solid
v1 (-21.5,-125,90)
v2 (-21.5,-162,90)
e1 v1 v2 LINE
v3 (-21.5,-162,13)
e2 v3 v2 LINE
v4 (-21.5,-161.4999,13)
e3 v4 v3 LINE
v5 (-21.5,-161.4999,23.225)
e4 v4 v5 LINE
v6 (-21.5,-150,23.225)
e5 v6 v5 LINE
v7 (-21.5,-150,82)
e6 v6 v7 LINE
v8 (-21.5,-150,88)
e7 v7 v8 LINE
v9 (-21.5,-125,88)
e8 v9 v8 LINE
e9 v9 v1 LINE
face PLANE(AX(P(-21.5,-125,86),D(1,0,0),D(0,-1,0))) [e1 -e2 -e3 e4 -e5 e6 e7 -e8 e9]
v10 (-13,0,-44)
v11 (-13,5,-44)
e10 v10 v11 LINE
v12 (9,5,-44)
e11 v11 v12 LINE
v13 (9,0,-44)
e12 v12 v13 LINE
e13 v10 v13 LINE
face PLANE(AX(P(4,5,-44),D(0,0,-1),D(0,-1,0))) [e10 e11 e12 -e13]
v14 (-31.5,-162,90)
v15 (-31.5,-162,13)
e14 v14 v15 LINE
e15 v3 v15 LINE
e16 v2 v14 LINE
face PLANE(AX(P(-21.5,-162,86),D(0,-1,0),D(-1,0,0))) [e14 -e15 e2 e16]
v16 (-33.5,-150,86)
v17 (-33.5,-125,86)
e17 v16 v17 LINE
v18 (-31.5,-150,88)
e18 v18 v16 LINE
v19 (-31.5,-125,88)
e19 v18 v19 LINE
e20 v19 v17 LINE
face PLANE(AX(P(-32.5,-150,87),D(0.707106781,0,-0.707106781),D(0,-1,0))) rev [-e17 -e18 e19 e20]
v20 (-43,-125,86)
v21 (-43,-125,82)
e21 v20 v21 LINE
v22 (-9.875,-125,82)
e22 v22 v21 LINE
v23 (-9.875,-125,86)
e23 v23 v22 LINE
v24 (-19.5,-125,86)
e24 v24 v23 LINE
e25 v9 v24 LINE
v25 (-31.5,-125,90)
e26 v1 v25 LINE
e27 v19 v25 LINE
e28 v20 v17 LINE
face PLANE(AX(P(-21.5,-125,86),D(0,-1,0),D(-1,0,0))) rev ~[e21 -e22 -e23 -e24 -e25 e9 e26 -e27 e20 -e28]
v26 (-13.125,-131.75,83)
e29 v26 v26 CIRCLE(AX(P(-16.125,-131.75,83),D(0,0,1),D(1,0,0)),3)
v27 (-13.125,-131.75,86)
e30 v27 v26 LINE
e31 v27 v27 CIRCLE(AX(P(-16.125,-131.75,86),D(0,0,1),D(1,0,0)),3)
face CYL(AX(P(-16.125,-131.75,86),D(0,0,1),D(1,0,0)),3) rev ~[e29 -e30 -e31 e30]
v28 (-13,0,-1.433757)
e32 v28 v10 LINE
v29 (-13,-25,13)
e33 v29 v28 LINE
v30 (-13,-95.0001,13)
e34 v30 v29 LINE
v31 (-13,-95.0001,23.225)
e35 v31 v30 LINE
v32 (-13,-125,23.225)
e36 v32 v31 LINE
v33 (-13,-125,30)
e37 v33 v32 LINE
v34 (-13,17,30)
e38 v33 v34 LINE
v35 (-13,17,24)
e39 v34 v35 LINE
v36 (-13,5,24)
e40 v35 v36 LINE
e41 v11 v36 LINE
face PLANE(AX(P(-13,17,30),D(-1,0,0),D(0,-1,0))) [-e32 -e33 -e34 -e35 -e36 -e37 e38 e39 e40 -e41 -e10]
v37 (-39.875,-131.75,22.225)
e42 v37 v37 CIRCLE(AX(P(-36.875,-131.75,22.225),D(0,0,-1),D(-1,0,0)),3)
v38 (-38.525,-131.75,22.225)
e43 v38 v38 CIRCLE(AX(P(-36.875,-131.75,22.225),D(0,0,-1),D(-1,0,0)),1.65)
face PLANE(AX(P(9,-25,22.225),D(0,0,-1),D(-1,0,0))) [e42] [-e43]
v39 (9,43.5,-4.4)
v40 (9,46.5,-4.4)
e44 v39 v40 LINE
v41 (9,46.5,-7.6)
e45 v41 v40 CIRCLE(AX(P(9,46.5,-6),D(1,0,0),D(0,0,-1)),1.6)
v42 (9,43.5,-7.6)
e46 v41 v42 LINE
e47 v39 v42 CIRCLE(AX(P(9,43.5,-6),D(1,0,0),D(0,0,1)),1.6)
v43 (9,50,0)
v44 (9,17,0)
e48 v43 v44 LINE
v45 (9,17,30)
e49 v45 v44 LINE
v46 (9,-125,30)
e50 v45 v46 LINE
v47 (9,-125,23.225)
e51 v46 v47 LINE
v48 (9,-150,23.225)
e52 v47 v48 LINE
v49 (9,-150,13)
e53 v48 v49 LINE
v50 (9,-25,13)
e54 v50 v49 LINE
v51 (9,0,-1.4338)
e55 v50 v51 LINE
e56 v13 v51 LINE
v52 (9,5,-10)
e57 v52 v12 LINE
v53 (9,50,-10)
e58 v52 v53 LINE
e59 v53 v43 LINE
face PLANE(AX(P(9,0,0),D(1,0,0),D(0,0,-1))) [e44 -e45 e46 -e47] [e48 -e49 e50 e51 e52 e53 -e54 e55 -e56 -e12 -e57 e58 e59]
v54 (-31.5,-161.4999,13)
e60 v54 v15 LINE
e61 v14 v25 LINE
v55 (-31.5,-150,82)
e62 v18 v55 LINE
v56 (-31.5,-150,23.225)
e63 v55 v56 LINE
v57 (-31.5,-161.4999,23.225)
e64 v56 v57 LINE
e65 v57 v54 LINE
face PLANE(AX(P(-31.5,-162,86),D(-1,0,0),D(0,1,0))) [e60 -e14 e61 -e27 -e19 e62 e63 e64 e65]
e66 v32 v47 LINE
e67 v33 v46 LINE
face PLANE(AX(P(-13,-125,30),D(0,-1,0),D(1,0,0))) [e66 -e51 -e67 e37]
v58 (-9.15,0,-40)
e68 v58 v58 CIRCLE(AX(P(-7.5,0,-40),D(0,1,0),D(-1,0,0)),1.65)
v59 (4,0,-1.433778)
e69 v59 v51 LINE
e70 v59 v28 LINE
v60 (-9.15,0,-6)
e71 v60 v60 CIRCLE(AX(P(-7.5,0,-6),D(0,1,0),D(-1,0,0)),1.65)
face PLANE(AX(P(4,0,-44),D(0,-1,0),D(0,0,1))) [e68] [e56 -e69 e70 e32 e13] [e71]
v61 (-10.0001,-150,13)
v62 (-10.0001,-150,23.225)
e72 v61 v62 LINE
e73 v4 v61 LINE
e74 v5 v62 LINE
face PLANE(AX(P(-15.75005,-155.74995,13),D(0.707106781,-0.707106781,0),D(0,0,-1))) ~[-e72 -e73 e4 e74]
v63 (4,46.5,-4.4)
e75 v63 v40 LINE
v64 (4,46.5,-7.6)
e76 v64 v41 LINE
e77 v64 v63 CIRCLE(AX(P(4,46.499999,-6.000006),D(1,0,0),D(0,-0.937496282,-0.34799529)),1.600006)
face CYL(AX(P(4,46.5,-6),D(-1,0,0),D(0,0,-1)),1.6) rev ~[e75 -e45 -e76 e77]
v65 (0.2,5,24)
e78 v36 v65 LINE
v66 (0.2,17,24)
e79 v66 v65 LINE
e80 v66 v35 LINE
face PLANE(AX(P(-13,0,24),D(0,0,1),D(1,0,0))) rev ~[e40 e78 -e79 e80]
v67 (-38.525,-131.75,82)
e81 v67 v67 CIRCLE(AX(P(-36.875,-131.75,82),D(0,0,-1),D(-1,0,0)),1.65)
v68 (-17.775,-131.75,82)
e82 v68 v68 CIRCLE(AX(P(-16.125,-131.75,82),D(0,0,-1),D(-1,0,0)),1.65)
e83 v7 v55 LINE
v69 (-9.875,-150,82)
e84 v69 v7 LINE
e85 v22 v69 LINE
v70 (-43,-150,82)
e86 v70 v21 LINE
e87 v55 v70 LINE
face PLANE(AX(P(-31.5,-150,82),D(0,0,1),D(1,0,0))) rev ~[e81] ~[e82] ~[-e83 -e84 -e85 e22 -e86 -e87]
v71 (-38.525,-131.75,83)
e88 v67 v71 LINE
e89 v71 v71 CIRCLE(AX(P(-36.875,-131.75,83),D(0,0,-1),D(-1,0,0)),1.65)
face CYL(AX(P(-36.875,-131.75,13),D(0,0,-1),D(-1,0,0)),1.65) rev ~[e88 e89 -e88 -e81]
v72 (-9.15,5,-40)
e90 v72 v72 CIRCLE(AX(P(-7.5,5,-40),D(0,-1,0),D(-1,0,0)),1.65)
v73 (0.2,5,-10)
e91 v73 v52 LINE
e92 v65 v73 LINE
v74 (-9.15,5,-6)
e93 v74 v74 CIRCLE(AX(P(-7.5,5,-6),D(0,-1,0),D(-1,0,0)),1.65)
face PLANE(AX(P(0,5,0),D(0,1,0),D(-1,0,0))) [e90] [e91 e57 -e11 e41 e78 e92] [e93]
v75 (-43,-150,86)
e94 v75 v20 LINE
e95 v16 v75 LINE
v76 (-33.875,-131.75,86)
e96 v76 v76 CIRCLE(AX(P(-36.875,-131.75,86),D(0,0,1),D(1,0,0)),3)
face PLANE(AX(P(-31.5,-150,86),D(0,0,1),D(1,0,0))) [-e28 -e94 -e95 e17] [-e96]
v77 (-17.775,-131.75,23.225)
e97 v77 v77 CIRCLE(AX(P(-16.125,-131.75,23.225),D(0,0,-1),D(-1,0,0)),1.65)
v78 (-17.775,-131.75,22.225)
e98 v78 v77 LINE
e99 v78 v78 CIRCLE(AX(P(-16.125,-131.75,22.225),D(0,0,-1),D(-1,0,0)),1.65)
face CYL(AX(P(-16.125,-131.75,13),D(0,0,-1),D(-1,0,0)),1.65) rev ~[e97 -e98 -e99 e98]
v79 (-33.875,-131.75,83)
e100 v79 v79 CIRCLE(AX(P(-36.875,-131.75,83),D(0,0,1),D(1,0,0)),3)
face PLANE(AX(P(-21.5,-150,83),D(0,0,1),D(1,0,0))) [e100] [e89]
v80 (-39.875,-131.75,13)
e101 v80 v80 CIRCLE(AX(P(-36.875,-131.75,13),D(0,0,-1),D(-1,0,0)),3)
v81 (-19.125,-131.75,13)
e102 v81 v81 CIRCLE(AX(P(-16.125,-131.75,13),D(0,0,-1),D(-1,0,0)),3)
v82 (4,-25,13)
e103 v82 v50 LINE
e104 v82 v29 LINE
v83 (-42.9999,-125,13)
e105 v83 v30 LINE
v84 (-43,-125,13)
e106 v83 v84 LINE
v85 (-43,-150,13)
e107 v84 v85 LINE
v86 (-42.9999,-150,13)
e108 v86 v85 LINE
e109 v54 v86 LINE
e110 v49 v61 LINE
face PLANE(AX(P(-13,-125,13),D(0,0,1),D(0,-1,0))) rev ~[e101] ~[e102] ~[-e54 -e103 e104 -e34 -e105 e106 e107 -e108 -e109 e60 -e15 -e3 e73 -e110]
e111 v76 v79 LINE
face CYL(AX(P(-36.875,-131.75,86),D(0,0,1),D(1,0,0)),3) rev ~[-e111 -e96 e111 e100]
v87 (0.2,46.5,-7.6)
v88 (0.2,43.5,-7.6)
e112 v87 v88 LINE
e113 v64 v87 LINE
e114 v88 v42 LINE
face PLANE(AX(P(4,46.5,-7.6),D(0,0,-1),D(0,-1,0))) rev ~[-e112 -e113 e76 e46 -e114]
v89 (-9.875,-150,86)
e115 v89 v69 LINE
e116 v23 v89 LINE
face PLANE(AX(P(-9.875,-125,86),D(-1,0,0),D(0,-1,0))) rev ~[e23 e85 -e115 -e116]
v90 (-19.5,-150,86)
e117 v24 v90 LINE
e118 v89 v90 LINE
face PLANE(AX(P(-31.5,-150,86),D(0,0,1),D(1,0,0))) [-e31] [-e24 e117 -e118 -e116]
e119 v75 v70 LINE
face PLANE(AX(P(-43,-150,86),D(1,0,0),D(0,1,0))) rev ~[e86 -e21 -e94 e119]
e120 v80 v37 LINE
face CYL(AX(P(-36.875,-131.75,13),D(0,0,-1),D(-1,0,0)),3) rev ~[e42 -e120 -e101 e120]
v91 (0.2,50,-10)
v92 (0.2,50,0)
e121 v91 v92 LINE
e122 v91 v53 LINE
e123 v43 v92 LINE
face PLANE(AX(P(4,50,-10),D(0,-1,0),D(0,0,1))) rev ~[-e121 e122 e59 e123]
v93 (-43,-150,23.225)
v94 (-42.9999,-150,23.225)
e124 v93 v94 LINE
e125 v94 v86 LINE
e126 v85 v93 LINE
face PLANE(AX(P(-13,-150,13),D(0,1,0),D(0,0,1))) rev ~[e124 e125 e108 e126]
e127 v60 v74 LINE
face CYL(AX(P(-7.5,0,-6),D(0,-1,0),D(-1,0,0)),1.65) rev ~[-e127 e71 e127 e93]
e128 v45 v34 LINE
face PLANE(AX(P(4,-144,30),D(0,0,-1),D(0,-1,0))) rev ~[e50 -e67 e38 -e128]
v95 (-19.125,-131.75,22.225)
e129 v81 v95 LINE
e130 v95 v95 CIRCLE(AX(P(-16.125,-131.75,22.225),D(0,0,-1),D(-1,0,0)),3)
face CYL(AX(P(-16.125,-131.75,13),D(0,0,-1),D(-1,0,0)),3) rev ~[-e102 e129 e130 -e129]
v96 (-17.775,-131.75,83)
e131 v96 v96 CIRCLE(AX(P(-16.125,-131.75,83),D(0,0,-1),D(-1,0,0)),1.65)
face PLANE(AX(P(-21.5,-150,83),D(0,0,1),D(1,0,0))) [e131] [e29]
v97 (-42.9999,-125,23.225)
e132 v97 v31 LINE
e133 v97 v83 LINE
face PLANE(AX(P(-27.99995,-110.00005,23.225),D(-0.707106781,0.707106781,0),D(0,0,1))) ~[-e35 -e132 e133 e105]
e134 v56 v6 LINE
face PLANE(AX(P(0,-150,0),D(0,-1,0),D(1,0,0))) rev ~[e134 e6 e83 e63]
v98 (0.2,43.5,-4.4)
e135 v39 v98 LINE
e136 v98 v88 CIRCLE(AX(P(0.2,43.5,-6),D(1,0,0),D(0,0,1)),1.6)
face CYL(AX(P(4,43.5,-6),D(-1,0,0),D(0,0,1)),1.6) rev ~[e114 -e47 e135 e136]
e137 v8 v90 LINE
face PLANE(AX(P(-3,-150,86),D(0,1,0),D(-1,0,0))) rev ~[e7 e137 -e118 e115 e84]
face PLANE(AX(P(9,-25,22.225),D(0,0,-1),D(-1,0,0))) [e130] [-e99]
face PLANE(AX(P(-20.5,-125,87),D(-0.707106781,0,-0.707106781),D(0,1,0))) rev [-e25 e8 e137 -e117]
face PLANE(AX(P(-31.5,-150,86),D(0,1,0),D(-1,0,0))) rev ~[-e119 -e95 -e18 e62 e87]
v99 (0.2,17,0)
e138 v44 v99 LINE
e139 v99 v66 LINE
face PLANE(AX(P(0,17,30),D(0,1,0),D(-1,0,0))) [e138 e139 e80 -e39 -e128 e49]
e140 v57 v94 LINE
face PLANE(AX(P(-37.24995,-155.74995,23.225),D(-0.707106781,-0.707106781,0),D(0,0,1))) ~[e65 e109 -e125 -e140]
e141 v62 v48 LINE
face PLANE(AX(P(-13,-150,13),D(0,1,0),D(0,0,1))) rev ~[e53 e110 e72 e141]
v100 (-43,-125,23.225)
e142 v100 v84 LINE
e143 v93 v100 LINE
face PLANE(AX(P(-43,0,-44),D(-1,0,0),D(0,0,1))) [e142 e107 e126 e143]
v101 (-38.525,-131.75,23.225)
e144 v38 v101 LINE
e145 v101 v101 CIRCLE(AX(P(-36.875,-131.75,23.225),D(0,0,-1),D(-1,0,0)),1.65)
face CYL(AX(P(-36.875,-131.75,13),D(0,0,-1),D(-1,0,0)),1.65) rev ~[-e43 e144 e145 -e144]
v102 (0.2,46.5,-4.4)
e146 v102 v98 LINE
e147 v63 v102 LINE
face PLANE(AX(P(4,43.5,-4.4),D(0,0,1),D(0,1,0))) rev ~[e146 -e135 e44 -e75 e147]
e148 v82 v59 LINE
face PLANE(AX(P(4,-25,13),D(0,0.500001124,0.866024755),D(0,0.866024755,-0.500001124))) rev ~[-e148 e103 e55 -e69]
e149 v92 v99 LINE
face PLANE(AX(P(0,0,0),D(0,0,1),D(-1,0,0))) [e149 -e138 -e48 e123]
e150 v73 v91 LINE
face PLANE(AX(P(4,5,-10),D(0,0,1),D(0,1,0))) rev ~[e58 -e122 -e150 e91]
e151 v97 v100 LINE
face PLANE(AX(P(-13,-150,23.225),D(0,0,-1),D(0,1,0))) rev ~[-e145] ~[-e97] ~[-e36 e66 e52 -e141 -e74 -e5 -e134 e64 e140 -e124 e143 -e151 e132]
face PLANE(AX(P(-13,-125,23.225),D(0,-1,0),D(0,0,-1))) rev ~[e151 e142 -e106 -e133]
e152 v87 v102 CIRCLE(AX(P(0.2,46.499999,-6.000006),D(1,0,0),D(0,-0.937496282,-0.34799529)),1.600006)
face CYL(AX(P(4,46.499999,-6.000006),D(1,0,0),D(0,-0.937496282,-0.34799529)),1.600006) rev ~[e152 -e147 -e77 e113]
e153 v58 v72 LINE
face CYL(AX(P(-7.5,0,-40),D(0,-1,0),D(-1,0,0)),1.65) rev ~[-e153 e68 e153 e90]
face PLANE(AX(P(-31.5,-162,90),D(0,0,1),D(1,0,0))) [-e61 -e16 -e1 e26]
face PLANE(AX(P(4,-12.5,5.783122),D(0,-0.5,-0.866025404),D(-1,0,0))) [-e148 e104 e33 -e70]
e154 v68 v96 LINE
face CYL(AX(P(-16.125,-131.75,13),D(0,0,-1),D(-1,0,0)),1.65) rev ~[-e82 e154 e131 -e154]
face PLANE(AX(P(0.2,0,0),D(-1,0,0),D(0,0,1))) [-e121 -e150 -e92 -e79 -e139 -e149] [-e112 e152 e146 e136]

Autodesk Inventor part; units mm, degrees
ref_plane "YZ Plane" through (0, 0, 0) normal (1, 0, 0) x (0, 1, 0)
ref_plane "XZ Plane" through (0, 0, 0) normal (0, 1, 0) x (-1, 0, 0)
ref_plane "XY Plane" through (0, 0, 0) normal (0, 0, 1) x (1, 0, 0)
sketch "Sketch1" plane through (0, 0, 0) normal (0, 1, 0) x (-1, 0, 0)
  line L0 (0, 0) -> (13, 0)
  line L1 (13, 0) -> (13, -44)
  line L2 (13, -44) -> (0, -44)
  line L3 (0, -44) -> (0, 0)
  line L4 (13, 0) -> (13, -6)
  line L5 (13, -6) -> (7.5, -6)
  line L6 (7.5, -6) -> (7.5, -40)
  circle A0 centre (7.5, -6) radius 1.65
  circle A1 centre (7.5, -40) radius 1.65
  dimension "d0" = 13
  dimension "d1" = 44
  dimension "d2" = 6
  dimension "d3" = 5.5
  dimension "d4" = 34
  dimension "d5" = 3.3
  dimension "d6" = 3.3
extrude "Extrusion1" add sketch "Sketch1" along normal blind 5
sketch "Sketch2" plane through (0, 0, 0) normal (1, 0, 0) x (0, 0, -1)
  line L0 (0, 5) -> (44, 5) projected
  line L1 (0, 5) -> (44, 5)
  line L2 (44, 5) -> (44, 50)
  line L3 (44, 50) -> (0, 50)
  line L4 (0, 50) -> (0, 5)
  line L5 (0, 0) -> (44, 0)
  line L6 (44, 0) -> (44, 5)
  line L7 (44, 5) -> (0, 5)
  line L8 (0, 5) -> (0, 0)
  line L9 (0, 50) -> (10, 50)
  line L10 (10, 50) -> (10, 5)
  line L11 (10, 5) -> (0, 5)
  line L12 (0, 5) -> (0, 50)
  dimension "d9" = 44
  dimension "d10" = 45
  dimension "d11" = 10
extrude "Extrusion2" add sketch "Sketch2" along normal blind 4 contours L4 L3 L10 L0 | L0 L6 L5 L8
sketch "Sketch3" plane through (4, 0, 0) normal (1, 0, 0) x (0, 0, -1)
  line L0 (44, 5) -> (10, 5) projected
  line L1 (10, 5) -> (10, 45)
  line L2 (10, 5) -> (10, 50) projected
  line L3 (0, 50) -> (0, 5) projected
  line L4 (0, 45) -> (4.4, 45)
  line L5 (6, 45) -> (6, 46.5)
  line L6 (6, 45) -> (6, 43.5)
  line L7 (4.4, 46.5) -> (4.4, 43.5)
  line L8 (7.6, 46.5) -> (7.6, 43.5)
  arc A0 (5.4432, 45) -> (6, 44.9) centre (6, 46.5) ccw
  arc A1 (6.5568, 45) -> (4.4, 46.5) centre (6, 46.5) ccw
  line L9 (10, 45) -> (6.5568, 45)
  line L10 (5.4432, 45) -> (0, 45)
  arc A2 (6, 45.1) -> (5.4432, 45) centre (6, 43.5) ccw
  arc A3 (4.4, 43.5) -> (7.6, 43.5) centre (6, 43.5) ccw
  point P0 (0, 0)
  dimension "d14" = 40
  dimension "d15" = 6
  dimension "d16" = 1.5
  dimension "d17" = 1.5
extrude "Extrusion3" cut sketch "Sketch3" against normal blind 4 contours L6 A0 A2 L5 | A1 L9 L8 A3 L7 | L8 L9 A1
sketch "Sketch4" plane through (-13, 0, 0) normal (0, 0, 1) x (1, 0, 0)
  line L0 (0, 0) -> (17, 0) projected
  line L1 (17, 0) -> (17, 5) projected
  line L2 (0, 0) -> (17, 0)
  line L3 (17, 0) -> (17, 5)
  line L4 (17, 5) -> (0, 5)
  line L5 (0, 5) -> (0, 0)
  line L6 (13, 50) -> (13, 5) projected
  line L7 (17, 0) -> (13, 0)
  line L8 (13, 0) -> (13, 17)
  line L9 (13, 17) -> (17, 17)
  line L10 (17, 17) -> (17, 0)
  dimension "d22" = 17
extrude "Extrusion4" add sketch "Sketch4" along normal blind 30
sketch "Sketch5" plane through (0, 0, 0) normal (0, -1, 0) x (1, 0, 0)
  line L0 (-13, -44) -> (-13, 30) projected
  line L1 (-13, 30) -> (4, 30)
  line L2 (4, 30) -> (4, 13)
  line L3 (4, 13) -> (-13, 13)
  line L4 (-13, 13) -> (-13, 30)
  point P0 (0, 0)
  dimension "d25" = 17
  dimension "d26" = 17
extrude "Extrusion5" add sketch "Sketch5" along normal blind 150
sketch "Sketch7" plane through (0, -150, 0) normal (0, -1, 0) x (1, 0, 0)
  line L0 (4, 13) -> (-13, 13) projected
  line L1 (0, 30) -> (0, -10) projected
  line L2 (0, 13) -> (0, 30)
  line L3 (0, 30) -> (0, 52.6)
  circle A0 centre (-36, 52.6) radius 9
  line L4 (-36, 52.6) -> (-36, 36.6)
  line L5 (-36, 36.6) -> (-20, 36.6)
  line L6 (-36, 52.6) -> (-36, 68.6)
  line L7 (-36, 68.6) -> (-52, 68.6)
  line L8 (-52, 68.6) -> (-20, 68.6)
  line L9 (-20, 68.6) -> (-20, 36.6)
  line L10 (-20, 36.6) -> (-52, 36.6)
  line L11 (-52, 36.6) -> (-52, 68.6)
  circle A1 centre (-20, 68.6) radius 1.1
  circle A2 centre (-20, 36.6) radius 1.1
  circle A3 centre (-52, 36.6) radius 1.1
  circle A4 centre (-52, 68.6) radius 1.1
  circle A5 centre (-20, 68.6) radius 4
  circle A6 centre (-20, 36.6) radius 4
  line L12 (-52, 65.6) -> (-52, 70.6)
  line L13 (-52, 36.6) -> (-52, 42.6)
  circle A7 centre (-52, 68.6) radius 4
  circle A8 centre (-52, 36.6) radius 4
  point P0 (0, 0)
  point P1 (-20, 64.6)
  point P2 (-20, 40.6)
  dimension "d29" = 22.6
  dimension "d31" = 18
  dimension "d32" = 16
  dimension "d33" = 16
  dimension "d34" = 16
  dimension "d35" = 16
  dimension "d36" = 2.2
  dimension "d37" = 2.2
  dimension "d39" = 2.2
  dimension "d40" = 8
  dimension "d43" = 8
  dimension "d49" = 8
  dimension "d50" = 8
sketch "Sketch14" plane through (0, -150, 0) normal (0, -1, 0) x (1, 0, 0)
  line L0 (4, 13) -> (4, 30) projected
  line L1 (4, 13) -> (4, 52.6)
  line L2 (4, 52.6) -> (-26.5, 52.6)
  line L3 (-26.5, 52.6) -> (-26.5, 35.35)
  line L4 (-26.5, 35.35) -> (-9.25, 35.35)
  line L5 (-26.5, 52.6) -> (-43.75, 52.6)
  line L6 (-43.75, 52.6) -> (-43.75, 69.85)
  line L7 (-43.75, 69.85) -> (-9.25, 69.85)
  line L8 (-9.25, 69.85) -> (-9.25, 35.35)
  line L9 (-9.25, 35.35) -> (-43.75, 35.35)
  line L10 (-43.75, 35.35) -> (-43.75, 69.85)
  circle A0 centre (-43.75, 69.85) radius 0.95
  circle A1 centre (-9.25, 69.85) radius 0.95
  circle A2 centre (-9.25, 35.35) radius 0.95
  circle A3 centre (-43.75, 35.35) radius 0.95
  circle A4 centre (-43.75, 69.85) radius 4
  circle A5 centre (-9.25, 69.85) radius 4
  circle A6 centre (-9.25, 35.35) radius 4
  circle A7 centre (-43.75, 35.35) radius 4
  point P0 (0, 0)
  dimension "d91" = 39.6
  dimension "d92" = 30.5
  dimension "d93" = 17.25
  dimension "d94" = 17.25
  dimension "d95" = 17.25
  dimension "d96" = 17.25
  dimension "d97" = 1.9
  dimension "d98" = 1.9
  dimension "d99" = 1.9
  dimension "d100" = 1.9
  dimension "d101" = 8
  dimension "d102" = 8
  dimension "d103" = 8
  dimension "d104" = 8
extrude "Extrusion14" add sketch "Sketch14" against normal blind 6 contours A5 L7 A1 L8 | L8 A1 L7 A5 | A6 L4 A2 L8 | L8 A2 L4 A6 | A7 L10 A3 L9 | L9 A3 L10 A7 | A4 L7 A0 L6 | L6 A0 L7 A4
sketch "Sketch15" plane through (-9.25, -150, 69.85) normal (0, -1, 0) x (1, 0, 0)
  circle A0 centre (0, 0) radius 4 projected
  line L0 (0, 4) -> (10, 4)
  line L1 (10, 4) -> (10, -4)
  line L2 (10, -4) -> (0, -4)
  line L3 (0, -4) -> (0, 4)
  circle A1 centre (0, -34.5) radius 4 projected
  line L4 (0, -30.5) -> (10, -30.5)
  line L5 (10, -30.5) -> (10, -38.5)
  line L6 (10, -38.5) -> (0, -38.5)
  line L7 (0, -38.5) -> (0, -30.5)
  circle A2 centre (-34.5, -34.5) radius 4 projected
  line L8 (-34.5, -38.5) -> (-44.5, -38.5)
  line L9 (-44.5, -38.5) -> (-44.5, -30.5)
  line L10 (-44.5, -30.5) -> (-34.5, -30.5)
  line L11 (-34.5, -30.5) -> (-34.5, -38.5)
  circle A3 centre (-34.5, 0) radius 4 projected
  line L12 (-34.5, -4) -> (-44.5, -4)
  line L13 (-44.5, -4) -> (-44.5, 4)
  line L14 (-44.5, 4) -> (-34.5, 4)
  line L15 (-34.5, 4) -> (-34.5, -4)
  line L16 (-44.5, 4) -> (-38.5, 4)
  line L17 (-38.5, 4) -> (-38.5, -38.5)
  line L18 (-38.5, -38.5) -> (-44.5, -38.5)
  line L19 (-44.5, -38.5) -> (-44.5, 4)
  line L20 (10, 4) -> (4, 4)
  line L21 (4, 4) -> (4, -38.5)
  line L22 (4, -38.5) -> (10, -38.5)
  line L23 (10, -38.5) -> (10, 4)
  point P0 (9.25, -69.85)
  point P1 (-38.5, -4)
  point P2 (-34.5, 4)
  point P3 (-34.5, -30.5)
  point P4 (-38.5, -30.5)
  point P5 (0, -4)
  point P6 (4, -4)
  point P7 (4, -30.5)
  point P8 (0, -38.5)
  point P9 (10, -4)
  dimension "d107" = 10
  dimension "d108" = 8
  dimension "d109" = 10
  dimension "d110" = 8
  dimension "d111" = 10
  dimension "d112" = 8
  dimension "d113" = 10
  dimension "d114" = 8
  dimension "d115" = 6
  dimension "d116" = 6
extrude "Extrusion15" add sketch "Sketch15" against normal blind 6 contours L21 L2 A0 | A0 L0 L21 | L21 L0 L1 L2 | L2 L23 L4 L21 | L21 A1 L4 | L4 L5 L6 L21 | L21 L6 A1 | A2 L17 L10 | L8 L17 A2 | L17 L8 L9 L10 | L10 L19 L12 L17 | L17 A3 L12 | L12 L13 L14 L17 | L17 L14 A3
sketch "Sketch16" plane through (0, -150, 0) normal (0, -1, 0) x (1, 0, 0)
  line L0 (0.75, 73.85) -> (0.75, 31.35) projected
  line L1 (0.75, 73.85) -> (-51.25, 73.85)
  line L2 (-51.25, 73.85) -> (-51.25, 81.85)
  line L3 (-51.25, 81.85) -> (0.75, 81.85)
  line L4 (0.75, 81.85) -> (0.75, 73.85)
  line L5 (0.75, 31.35) -> (-9.25, 31.35) projected
  line L6 (0.75, 31.35) -> (-51.25, 31.35)
  line L7 (-51.25, 31.35) -> (-51.25, 23.35)
  line L8 (-51.25, 23.35) -> (0.75, 23.35)
  line L9 (0.75, 23.35) -> (0.75, 31.35)
  point P0 (0, 0)
  dimension "d119" = 8
  dimension "d120" = 8
extrude "Extrusion16" add sketch "Sketch16" against normal blind 6
sketch "Sketch17" plane through (0, -144, 0) normal (0, 1, 0) x (1, 0, 0)
  line L0 (0.75, -81.85) -> (0.75, -30) projected
  line L1 (4, -30) -> (0, -30) projected
  line L2 (0.75, -81.85) -> (4, -81.85)
  line L3 (4, -81.85) -> (4, -30)
  line L4 (4, -30) -> (0.75, -30)
  line L5 (0.75, -30) -> (0.75, -81.85)
  line L6 (-51.25, -23.35) -> (-51.25, -81.85) projected
  line L7 (-51.25, -23.35) -> (-13, -23.35)
  line L8 (-13, -23.35) -> (-13, -13)
  line L9 (-13, -13) -> (-51.25, -13)
  line L10 (-51.25, -13) -> (-51.25, -23.35)
  point P0 (0, 0)
  point P1 (0.75, -30)
  point P2 (0.75, -30)
extrude "Extrusion17" add sketch "Sketch17" against normal blind 6
chamfer "Chamfer4" distance 50 angle 30 1 edges at (-13, -144, 21.5) measured on face at (-13, -46.3333, 24.3333)
chamfer "Chamfer5" distance 25 angle 30 1 edges at (-4.5, 0, 13) measured on face at (-1.6667, -81.3333, 13)
sketch "Sketch19" plane through (-13, 0, 30) normal (0, 0, 1) x (1, 0, 0)
  line L0 (13, 17) -> (13, 5) projected
  line L1 (0, 0) -> (0, 5) projected
  line L2 (13, 17) -> (0, 17)
  line L3 (0, 17) -> (0, 5)
  line L4 (0, 5) -> (13, 5)
  line L5 (13, 5) -> (13, 17)
  point P0 (13, 0)
extrude "Extrusion18" add sketch "Sketch19" against normal blind 6
sketch "Sketch20" plane through (-51.25, -150, 13) normal (-1, 0, 0) x (0, 0, 1)
  line L0 (0, 125) -> (0, 0) projected
  line L1 (60.85, 6) -> (68.85, 6) projected
  line L2 (0, 0) -> (68.85, 0)
  line L3 (68.85, 0) -> (68.85, 6)
  line L4 (68.85, 6) -> (0, 6)
  line L5 (0, 6) -> (0, 0)
  point P0 (-13, 150)
extrude "Extrusion19" add sketch "Sketch20" along normal blind 3
sketch "Sketch21" plane through (0, 0, 0) normal (-1, 0, 0) x (0, 0, 1)
  line L0 (-10, 5) -> (-10, 50) projected
  line L1 (24, 5) -> (-10, 5) projected
  line L2 (-10, 50) -> (24, 50)
  line L3 (24, 50) -> (24, 5)
  line L4 (24, 5) -> (-10, 5)
  line L5 (-10, 5) -> (-10, 50)
  point P0 (0, 0)
extrude "Extrusion20" cut sketch "Sketch21" against normal blind 0.2
chamfer "Chamfer6" distance 2 angle 15 1 edges at (-10.2, -150, 69.85) measured on face at (-8.3489, -146, 69.5492)
chamfer "Chamfer7" distance 2 angle 15 1 edges at (-10.2, -150, 35.35) measured on face at (-8.6492, -146, 36.0859)
chamfer "Chamfer8" distance 2 angle 15 1 edges at (-44.7, -150, 35.35) measured on face at (-43.7117, -146, 34.4008)
chamfer "Chamfer9" distance 2 angle 15 1 edges at (-44.7, -150, 69.85) measured on face at (-42.8489, -146, 69.5492)
sketch "Sketch22" plane through (4, 0, 0) normal (1, 0, 0) x (0, 0, -1)
  line L0 (44, 0) -> (1.4338, 0) projected
  line L1 (-30, 17) -> (-30, -144) projected
  line L2 (44, 0) -> (-30, 0)
  line L3 (-30, 0) -> (-30, 17)
  line L4 (-30, 17) -> (44, 17)
  line L5 (44, 17) -> (44, 0)
  line L6 (10, 50) -> (0, 50) projected
  line L7 (10, 50) -> (0, 50)
  line L8 (0, 50) -> (0, 0)
  line L9 (0, 0) -> (10, 0)
  line L10 (10, 0) -> (10, 50)
  line L11 (10, 5) -> (10, 50) projected
  line L12 (44, 17) -> (10, 17)
  line L13 (10, 17) -> (10, 5)
  line L14 (10, 5) -> (44, 5)
  line L15 (44, 5) -> (44, 17)
  arc A0 (4.4, 43.5) -> (7.6, 43.5) centre (6, 43.5) ccw projected
  circle A1 centre (6, 43.5) radius 1.6
  arc A2 (7.6, 46.5) -> (4.4, 46.5) centre (6, 46.5) ccw projected
  circle A3 centre (6, 46.5) radius 1.6
  line L16 (7.6, 46.5) -> (7.6, 43.5) projected
  line L17 (7.6, 46.5) -> (7.6, 43.5)
  line L18 (7.6, 43.5) -> (4.4, 43.5)
  line L19 (4.4, 43.5) -> (4.4, 46.5) projected
  line L20 (4.4, 46.5) -> (4.4, 43.5)
  point P0 (0, 17)
  point P1 (1.4338, 0)
extrude "Extrusion21" add sketch "Sketch22" along normal blind 5 contours L0 L10 L14 L5 | L0 L2 L8 L4 L10 | L2 L1 L4 L8 | L4 L8 L6 L10
sketch "Sketch23" plane through (4, 0, 0) normal (1, 0, 0) x (0, 0, -1)
  line L0 (-13, -25) -> (-13, -94) projected
  line L1 (-13, -25) -> (1.4338, 0) projected
  line L2 (-13, -25) -> (1.4338, 0)
  line L3 (-30, 0) -> (44, 0) projected
  line L4 (1.4338, 0) -> (-30, 0)
  line L5 (-30, 0) -> (-30, -144) projected
  line L6 (-30, 0) -> (-30, -144)
  line L7 (-81.85, -144) -> (-13, -144) projected
  line L8 (-30, -144) -> (-13, -144)
  line L9 (-13, -144) -> (-13, -25)
  point P0 (0, 0)
extrude "Extrusion22" add sketch "Sketch23" along normal blind 5
sketch "Sketch24" plane through (0, -150, 0) normal (0, -1, 0) x (1, 0, 0)
  circle A0 centre (-9.25, 69.85) radius 0.95 projected
  circle A1 centre (-43.75, 69.85) radius 0.95 projected
  line L0 (-9.25, 69.85) -> (-43.75, 69.85)
  line L1 (-26.5, 69.85) -> (-26.5, 28.2392)
  circle A2 centre (-43.75, 35.35) radius 0.95 projected
  line L2 (-43.75, 69.85) -> (-43.75, 35.35)
  line L3 (-43.75, 52.6) -> (-12.0502, 52.6)
  circle A3 centre (-26.5, 52.6) radius 1.7553
  point P0 (0, 0)
extrude "Extrusion23" add sketch "Sketch24" against normal blind 10 contours A3 L3 L1 | L1 L3 A3 | L3 L1 A3 | L3 A3 L1
sketch "Sketch25" plane through (0, -144, 0) normal (0, 1, 0) x (1, 0, 0)
  line L0 (4, -81.85) -> (4, -30) projected
  line L1 (4, -30) -> (-54.25, -30)
  line L2 (-54.25, -30) -> (-54.25, -81.85)
  line L3 (-54.25, -81.85) -> (4, -81.85)
  line L4 (4, -81.85) -> (4, -30)
  line L5 (-54.25, -81.85) -> (-54.25, -13) projected
  line L6 (-41.8675, -13) -> (-41.8675, -30) projected
  line L7 (-54.25, -13) -> (-41.8675, -13)
  line L8 (-41.8675, -13) -> (-41.8675, -30)
  line L9 (-41.8675, -30) -> (-54.25, -30)
  line L10 (-54.25, -30) -> (-54.25, -13)
  point P0 (0, 0)
extrude "Extrusion24" cut sketch "Sketch25" against normal blind 10
sketch "Sketch26" plane through (4, 0, 0) normal (1, 0, 0) x (0, 0, -1)
  line L0 (-13, -144) -> (-13, -150) projected
  line L1 (-30, -150) -> (-13, -150)
  line L2 (-13, -150) -> (-13, -144)
  line L3 (-13, -144) -> (-30, -144)
  line L4 (-30, -144) -> (-30, -150)
  point P0 (0, 0)
extrude "Extrusion25" add sketch "Sketch26" along normal blind 5
sketch "Sketch27" plane through (-13, 0, 30) normal (0, 0, 1) x (1, 0, 0)
  line L0 (0, -94) -> (-28.8675, -144) projected
  line L1 (22, -150) -> (-28.8675, -150) projected
  line L2 (0, -94) -> (-28.8675, -94)
  line L3 (-28.8675, -94) -> (-28.8675, -150)
  line L4 (-28.8675, -150) -> (0, -150)
  line L5 (0, -150) -> (0, -94)
  point P0 (13, 0)
  point P1 (0, -150)
extrude "Extrusion26" cut sketch "Sketch27" against normal blind 65 contours L5 L1 L3 L0
sketch "Sketch28" plane through (-13, 0, 30) normal (0, 0, 1) x (1, 0, 0)
  line L0 (22, -150) -> (0, -150) projected
  line L1 (0, 17) -> (0, -150) projected
  line L2 (22, -150) -> (0, -150)
  line L3 (0, -150) -> (0, -125)
  line L4 (0, -125) -> (22, -125)
  line L5 (22, -125) -> (22, -150)
  point P0 (13, 0)
  dimension "d165" = 25
extrude "Extrusion27" cut sketch "Sketch28" against normal blind 6.775
sketch "Sketch30" plane through (-13, 0, -44) normal (-1, 0, 0) x (0, 0, 1)
  line L0 (57, -25) -> (57, -150) projected
  line L1 (67.225, -125) -> (57, -125)
  line L2 (57, -125) -> (57, -150)
  line L3 (57, -150) -> (67.225, -150)
  line L4 (67.225, -150) -> (67.225, -125)
  point P0 (44, 0)
extrude "Extrusion28" add sketch "Sketch30" along normal blind 30
sketch "Sketch31" plane through (0, -150, 0) normal (0, -1, 0) x (1, 0, 0)
  line L0 (-43, 13) -> (-43, 23.225) projected
  line L1 (-43, 13) -> (-26.5, 13)
  line L2 (-13, 13) -> (-43, 13) projected
  line L3 (-26.5, 13) -> (-26.5, 86)
  line L4 (-26.5, 86) -> (-21.5, 86)
  line L5 (-21.5, 86) -> (-31.5, 86)
  line L6 (-31.5, 86) -> (-31.5, 13)
  line L7 (-31.5, 13) -> (-21.5, 13)
  line L8 (-21.5, 13) -> (-21.5, 86)
  point P0 (0, 0)
  point P1 (-21.5, 13)
  point P2 (-31.5, 13)
  dimension "d170" = 16.5
  dimension "d171" = 73
  dimension "d172" = 5
  dimension "d173" = 10
  dimension "d174" = 73
extrude "Extrusion29" add sketch "Sketch31" along normal blind 12
sketch "Sketch32" plane through (-31.5, -150, 86) normal (0, 0, 1) x (1, 0, 0)
  line L0 (-11.5, 0) -> (-11.5, 25) projected
  line L1 (0, 0) -> (-11.5, 0)
  line L2 (-11.5, 0) -> (-11.5, 25)
  line L3 (-11.5, 25) -> (28.5, 25)
  line L4 (18.5, 25) -> (-11.5, 25) projected
  line L5 (28.5, 25) -> (28.5, 0)
  line L6 (40.5, 0) -> (10, 0) projected
  line L7 (0, 0) -> (-11.5, 0) projected
  line L8 (28.5, 0) -> (-11.5, 0)
  point P0 (31.5, 150)
  point P1 (10, 0)
  dimension "d177" = 25
  dimension "d178" = 40
extrude "Extrusion30" add sketch "Sketch32" against normal blind 4
sketch "Sketch33" plane through (9, -25, 13) normal (0, 0, -1) x (-1, 0, 0)
  line L0 (30.5, -137) -> (40.5, -137) projected
  line L1 (35.5, -137) -> (35.5, -125)
  line L2 (30.5, -125) -> (40.5, -125) projected
  line L3 (35.5, -125) -> (35.5, -106.75)
  line L4 (35.5, -106.75) -> (25.125, -106.75)
  line L5 (25.125, -106.75) -> (45.875, -106.75)
  circle A0 centre (25.125, -106.75) radius 1.65
  circle A1 centre (45.875, -106.75) radius 1.65
  point P0 (9, 25)
  dimension "d181" = 12
  dimension "d183" = 18.25
  dimension "d184" = 10.375
  dimension "d185" = 20.75
  dimension "d186" = 3.3
  dimension "d187" = 3.3
extrude "Extrusion31" cut sketch "Sketch33" against normal blind 400
sketch "Sketch34" plane through (-31.5, -162, 86) normal (0, 0, 1) x (1, 0, 0)
  line L0 (28.5, 37) -> (28.5, 12) projected
  line L1 (28.5, 37) -> (21.625, 37)
  line L2 (21.625, 37) -> (21.625, 12)
  line L3 (21.625, 12) -> (28.5, 12)
  line L4 (28.5, 12) -> (28.5, 37)
  point P0 (31.5, 162)
  dimension "d190" = 6.875
  dimension "d191" = 25
extrude "Extrusion32" cut sketch "Sketch34" against normal blind 4
sketch "Sketch35" plane through (-31.5, -162, 86) normal (0, 0, 1) x (1, 0, 0)
  line L0 (10, 0) -> (0, 0) projected
  line L1 (18.5, 37) -> (-11.5, 37) projected
  line L2 (10, 0) -> (0, 0)
  line L3 (0, 0) -> (0, 37)
  line L4 (0, 37) -> (10, 37)
  line L5 (10, 37) -> (10, 0)
  point P0 (31.5, 162)
  dimension "d194" = 10
extrude "Extrusion33" add sketch "Sketch35" along normal blind 4
sketch "Sketch36" plane through (-21.5, -150, 86) normal (0, 0, 1) x (1, 0, 0)
  circle A0 centre (5.375, 18.25) radius 1.65 projected
  circle A1 centre (5.375, 18.25) radius 3
  circle A2 centre (-15.375, 18.25) radius 1.65 projected
  circle A3 centre (-15.375, 18.25) radius 3
  point P0 (21.5, 150)
  dimension "d197" = 6
  dimension "d198" = 6
extrude "Extrusion34" cut sketch "Sketch36" against normal blind 3 contours A0 | A1 | A2 | A3
sketch "Sketch37" plane through (9, -25, 13) normal (0, 0, -1) x (-1, 0, 0)
  circle A0 centre (25.125, -106.75) radius 1.65 projected
  circle A1 centre (25.125, -106.75) radius 3
  circle A2 centre (45.875, -106.75) radius 1.65 projected
  circle A3 centre (45.875, -106.75) radius 3
  point P0 (9, 25)
  dimension "d201" = 6
  dimension "d202" = 6
extrude "Extrusion35" cut sketch "Sketch37" against normal blind 9.225
chamfer "Chamfer12" distance 2 angle 45 2 edges at (-21.5, -137.5, 86) (-31.5, -137.5, 86)
chamfer "Chamfer13" distance 11.5 angle 45 2 edges at (-21.5, -150, 18.1125) (-31.5, -150, 18.1125)
chamfer "Chamfer14" distance 30 angle 45 1 edges at (-13, -125, 18.1125)
sketch "Sketch38" plane through (-26.5, -140, 52.6) normal (0, 1, 0) x (1, 0, 0)
  circle A0 centre (0, 0) radius 1.7553 projected
  circle A1 centre (0, 0) radius 2.4824
  point P0 (26.5, 52.6)
extrude "Extrusion36" cut sketch "Sketch38" against normal blind 5 contours A0
properties part number "camera_mount_v3"
